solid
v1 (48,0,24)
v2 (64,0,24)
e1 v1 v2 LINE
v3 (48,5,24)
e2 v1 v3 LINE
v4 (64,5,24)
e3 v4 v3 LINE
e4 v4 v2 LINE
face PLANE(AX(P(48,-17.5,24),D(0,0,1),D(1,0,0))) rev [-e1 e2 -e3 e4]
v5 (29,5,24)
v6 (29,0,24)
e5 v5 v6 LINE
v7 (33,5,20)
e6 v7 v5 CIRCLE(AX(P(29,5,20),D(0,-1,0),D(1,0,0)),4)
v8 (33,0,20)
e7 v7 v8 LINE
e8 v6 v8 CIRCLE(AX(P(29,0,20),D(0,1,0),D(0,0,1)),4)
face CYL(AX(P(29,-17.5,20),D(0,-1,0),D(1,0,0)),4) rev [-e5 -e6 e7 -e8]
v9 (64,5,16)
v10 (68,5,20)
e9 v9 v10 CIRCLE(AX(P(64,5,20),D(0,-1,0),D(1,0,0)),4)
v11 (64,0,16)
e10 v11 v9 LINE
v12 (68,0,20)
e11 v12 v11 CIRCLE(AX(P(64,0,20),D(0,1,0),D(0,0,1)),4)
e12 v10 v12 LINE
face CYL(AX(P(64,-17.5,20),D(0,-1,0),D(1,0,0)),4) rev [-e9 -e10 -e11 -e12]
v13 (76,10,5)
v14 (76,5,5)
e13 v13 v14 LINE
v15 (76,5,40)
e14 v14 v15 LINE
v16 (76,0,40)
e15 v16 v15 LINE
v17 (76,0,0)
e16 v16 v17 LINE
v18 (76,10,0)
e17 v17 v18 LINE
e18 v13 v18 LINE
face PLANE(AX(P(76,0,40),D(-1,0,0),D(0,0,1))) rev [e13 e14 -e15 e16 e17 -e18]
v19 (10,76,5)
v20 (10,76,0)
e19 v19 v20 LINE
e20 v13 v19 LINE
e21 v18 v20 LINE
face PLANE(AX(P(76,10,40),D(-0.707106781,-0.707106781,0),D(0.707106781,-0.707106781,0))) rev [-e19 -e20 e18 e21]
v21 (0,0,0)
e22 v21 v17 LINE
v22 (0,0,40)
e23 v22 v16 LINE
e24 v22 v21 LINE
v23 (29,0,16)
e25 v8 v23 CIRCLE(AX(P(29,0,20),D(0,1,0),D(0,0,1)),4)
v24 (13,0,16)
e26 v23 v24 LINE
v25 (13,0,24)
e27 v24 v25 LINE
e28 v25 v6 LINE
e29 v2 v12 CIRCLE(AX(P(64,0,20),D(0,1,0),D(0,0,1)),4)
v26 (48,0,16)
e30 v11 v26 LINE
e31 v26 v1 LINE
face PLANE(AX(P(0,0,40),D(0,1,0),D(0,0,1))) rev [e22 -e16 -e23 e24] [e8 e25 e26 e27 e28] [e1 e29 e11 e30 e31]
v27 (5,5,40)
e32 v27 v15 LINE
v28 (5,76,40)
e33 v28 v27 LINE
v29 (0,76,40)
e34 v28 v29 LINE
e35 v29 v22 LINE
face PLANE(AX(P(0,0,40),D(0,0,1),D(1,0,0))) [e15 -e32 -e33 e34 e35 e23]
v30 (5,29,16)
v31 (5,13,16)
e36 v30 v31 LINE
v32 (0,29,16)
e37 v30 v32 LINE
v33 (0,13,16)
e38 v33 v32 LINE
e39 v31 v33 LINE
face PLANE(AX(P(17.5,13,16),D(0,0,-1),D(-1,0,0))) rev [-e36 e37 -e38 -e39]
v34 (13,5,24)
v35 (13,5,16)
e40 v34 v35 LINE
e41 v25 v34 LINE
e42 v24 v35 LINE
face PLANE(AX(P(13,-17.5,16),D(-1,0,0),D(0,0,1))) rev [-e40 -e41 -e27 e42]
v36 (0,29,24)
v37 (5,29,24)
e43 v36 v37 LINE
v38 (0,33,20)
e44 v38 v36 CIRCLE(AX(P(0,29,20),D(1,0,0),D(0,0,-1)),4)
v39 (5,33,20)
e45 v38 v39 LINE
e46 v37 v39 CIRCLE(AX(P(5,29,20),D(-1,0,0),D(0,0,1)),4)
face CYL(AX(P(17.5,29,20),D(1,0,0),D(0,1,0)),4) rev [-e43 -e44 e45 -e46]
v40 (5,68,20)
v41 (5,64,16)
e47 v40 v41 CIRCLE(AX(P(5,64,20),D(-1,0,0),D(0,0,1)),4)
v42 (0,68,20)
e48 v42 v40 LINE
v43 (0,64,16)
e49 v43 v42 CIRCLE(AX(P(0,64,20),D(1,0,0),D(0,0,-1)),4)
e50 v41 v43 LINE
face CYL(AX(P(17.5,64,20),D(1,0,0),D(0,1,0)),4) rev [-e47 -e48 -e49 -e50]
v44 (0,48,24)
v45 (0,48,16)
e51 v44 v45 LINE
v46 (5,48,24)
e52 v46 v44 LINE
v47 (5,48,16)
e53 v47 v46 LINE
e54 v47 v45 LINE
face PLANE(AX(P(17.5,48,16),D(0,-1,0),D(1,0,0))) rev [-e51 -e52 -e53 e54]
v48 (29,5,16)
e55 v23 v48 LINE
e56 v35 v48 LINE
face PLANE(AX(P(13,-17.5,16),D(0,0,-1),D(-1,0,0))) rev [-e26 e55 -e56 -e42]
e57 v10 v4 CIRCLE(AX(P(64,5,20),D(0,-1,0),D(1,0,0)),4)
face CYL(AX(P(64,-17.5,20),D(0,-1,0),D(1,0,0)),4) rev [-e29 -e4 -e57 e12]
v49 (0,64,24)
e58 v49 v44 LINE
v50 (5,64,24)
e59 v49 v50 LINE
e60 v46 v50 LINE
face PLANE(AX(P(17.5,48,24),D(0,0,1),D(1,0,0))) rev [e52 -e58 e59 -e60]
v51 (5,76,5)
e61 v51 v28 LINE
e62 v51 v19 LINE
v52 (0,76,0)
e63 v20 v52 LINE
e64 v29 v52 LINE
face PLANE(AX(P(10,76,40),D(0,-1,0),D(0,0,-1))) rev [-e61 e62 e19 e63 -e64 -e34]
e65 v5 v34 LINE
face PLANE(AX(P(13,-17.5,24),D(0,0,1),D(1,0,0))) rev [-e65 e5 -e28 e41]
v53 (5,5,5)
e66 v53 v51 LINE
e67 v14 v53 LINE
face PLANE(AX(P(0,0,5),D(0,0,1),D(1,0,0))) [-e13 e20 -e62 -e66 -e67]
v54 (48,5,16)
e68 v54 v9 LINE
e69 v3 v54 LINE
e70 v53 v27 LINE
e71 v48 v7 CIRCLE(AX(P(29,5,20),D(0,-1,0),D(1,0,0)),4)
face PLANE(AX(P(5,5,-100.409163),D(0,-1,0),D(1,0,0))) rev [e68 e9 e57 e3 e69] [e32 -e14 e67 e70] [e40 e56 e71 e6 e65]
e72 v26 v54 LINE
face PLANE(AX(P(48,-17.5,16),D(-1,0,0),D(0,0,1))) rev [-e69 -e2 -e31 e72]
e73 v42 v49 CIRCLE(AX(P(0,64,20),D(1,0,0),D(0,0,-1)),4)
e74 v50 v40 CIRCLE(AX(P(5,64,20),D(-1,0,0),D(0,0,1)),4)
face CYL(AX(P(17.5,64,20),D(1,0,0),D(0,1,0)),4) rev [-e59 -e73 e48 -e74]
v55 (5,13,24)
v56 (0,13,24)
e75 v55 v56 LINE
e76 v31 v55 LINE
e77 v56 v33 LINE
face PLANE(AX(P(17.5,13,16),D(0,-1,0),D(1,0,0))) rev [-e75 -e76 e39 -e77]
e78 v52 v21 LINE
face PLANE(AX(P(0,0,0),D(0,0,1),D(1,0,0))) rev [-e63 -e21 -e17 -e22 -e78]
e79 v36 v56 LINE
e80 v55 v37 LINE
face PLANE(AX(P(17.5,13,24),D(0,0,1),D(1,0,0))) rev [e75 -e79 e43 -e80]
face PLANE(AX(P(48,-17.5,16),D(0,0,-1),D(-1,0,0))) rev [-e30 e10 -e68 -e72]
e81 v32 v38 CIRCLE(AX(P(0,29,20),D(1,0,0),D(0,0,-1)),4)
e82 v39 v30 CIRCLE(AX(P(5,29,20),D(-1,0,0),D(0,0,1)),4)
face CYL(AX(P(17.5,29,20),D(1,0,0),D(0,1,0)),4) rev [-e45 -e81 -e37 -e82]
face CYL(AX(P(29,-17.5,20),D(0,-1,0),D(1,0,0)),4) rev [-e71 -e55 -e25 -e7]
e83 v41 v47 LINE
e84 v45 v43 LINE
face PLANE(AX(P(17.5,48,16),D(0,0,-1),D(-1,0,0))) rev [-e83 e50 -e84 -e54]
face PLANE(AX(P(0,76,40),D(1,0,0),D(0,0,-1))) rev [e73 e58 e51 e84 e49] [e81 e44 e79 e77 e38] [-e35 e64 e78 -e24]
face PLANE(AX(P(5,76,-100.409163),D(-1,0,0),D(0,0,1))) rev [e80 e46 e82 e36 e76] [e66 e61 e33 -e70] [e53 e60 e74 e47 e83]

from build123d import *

# Parameters (mm, degrees)
BOSS_EXTRUDE1_DEPTH = 40
SKETCH2_W           = 71
SKETCH2_H           = 71
CUT_EXTRUDE1_DEPTH  = 35
SKETCH3_W           = 20
SKETCH3_H           = 8
CUT_EXTRUDE2_DEPTH  = 22.5
CIRPATTERN1_COUNT   = 2
CIRPATTERN1_ANGLE   = 90
FILLET1_R           = 4


with BuildPart() as part:
    # Sketch1 → Boss-Extrude1 (new body)
    with BuildSketch(Plane.XY):
        Polygon((0, 76), (0, 0), (76, 0), (76, 10), (10, 76), align=None)
    extrude(amount=BOSS_EXTRUDE1_DEPTH)

    # Sketch2 → Cut-Extrude1 (cut)
    with BuildSketch(Plane.XY.offset(40)):
        with Locations((40.5, 40.5)):
            Rectangle(SKETCH2_W, SKETCH2_H)
    extrude(amount=-CUT_EXTRUDE1_DEPTH, mode=Mode.SUBTRACT)

    # Sketch3 → Cut-Extrude2 (cut, symmetric)
    with BuildSketch(Plane(origin=(0, 5, 0), x_dir=(1, 0, 0), z_dir=(0, 1, 0))):
        with Locations((23, -20)):
            Rectangle(SKETCH3_W, SKETCH3_H)
        with Locations((58, -20)):
            Rectangle(SKETCH3_W, SKETCH3_H)
    cut_extrude2 = extrude(amount=CUT_EXTRUDE2_DEPTH, both=True, mode=Mode.SUBTRACT)

    # CirPattern1: Cut-Extrude2 ×2 about axis
    cirpattern1_axis = Axis((0, 0, 40), (0, 0, 1))
    for i in range(1, CIRPATTERN1_COUNT):
        add(cut_extrude2.rotate(cirpattern1_axis, i * CIRPATTERN1_ANGLE / (CIRPATTERN1_COUNT - 1)), mode=Mode.SUBTRACT)

    # Fillet1
    fillet1_edges = [part.edges().sort_by_distance(p)[0] for p in [
        (68, 2.5, 24),
        (68, 2.5, 16),
        (33, 2.5, 24),
        (33, 2.5, 16),
        (2.5, 33, 24),
        (2.5, 33, 16),
        (2.5, 68, 24),
        (2.5, 68, 16),
    ]]
    fillet(fillet1_edges, radius=FILLET1_R - 0.0001)  # a hair under: the kernel refuses the full size


solid = part.part
